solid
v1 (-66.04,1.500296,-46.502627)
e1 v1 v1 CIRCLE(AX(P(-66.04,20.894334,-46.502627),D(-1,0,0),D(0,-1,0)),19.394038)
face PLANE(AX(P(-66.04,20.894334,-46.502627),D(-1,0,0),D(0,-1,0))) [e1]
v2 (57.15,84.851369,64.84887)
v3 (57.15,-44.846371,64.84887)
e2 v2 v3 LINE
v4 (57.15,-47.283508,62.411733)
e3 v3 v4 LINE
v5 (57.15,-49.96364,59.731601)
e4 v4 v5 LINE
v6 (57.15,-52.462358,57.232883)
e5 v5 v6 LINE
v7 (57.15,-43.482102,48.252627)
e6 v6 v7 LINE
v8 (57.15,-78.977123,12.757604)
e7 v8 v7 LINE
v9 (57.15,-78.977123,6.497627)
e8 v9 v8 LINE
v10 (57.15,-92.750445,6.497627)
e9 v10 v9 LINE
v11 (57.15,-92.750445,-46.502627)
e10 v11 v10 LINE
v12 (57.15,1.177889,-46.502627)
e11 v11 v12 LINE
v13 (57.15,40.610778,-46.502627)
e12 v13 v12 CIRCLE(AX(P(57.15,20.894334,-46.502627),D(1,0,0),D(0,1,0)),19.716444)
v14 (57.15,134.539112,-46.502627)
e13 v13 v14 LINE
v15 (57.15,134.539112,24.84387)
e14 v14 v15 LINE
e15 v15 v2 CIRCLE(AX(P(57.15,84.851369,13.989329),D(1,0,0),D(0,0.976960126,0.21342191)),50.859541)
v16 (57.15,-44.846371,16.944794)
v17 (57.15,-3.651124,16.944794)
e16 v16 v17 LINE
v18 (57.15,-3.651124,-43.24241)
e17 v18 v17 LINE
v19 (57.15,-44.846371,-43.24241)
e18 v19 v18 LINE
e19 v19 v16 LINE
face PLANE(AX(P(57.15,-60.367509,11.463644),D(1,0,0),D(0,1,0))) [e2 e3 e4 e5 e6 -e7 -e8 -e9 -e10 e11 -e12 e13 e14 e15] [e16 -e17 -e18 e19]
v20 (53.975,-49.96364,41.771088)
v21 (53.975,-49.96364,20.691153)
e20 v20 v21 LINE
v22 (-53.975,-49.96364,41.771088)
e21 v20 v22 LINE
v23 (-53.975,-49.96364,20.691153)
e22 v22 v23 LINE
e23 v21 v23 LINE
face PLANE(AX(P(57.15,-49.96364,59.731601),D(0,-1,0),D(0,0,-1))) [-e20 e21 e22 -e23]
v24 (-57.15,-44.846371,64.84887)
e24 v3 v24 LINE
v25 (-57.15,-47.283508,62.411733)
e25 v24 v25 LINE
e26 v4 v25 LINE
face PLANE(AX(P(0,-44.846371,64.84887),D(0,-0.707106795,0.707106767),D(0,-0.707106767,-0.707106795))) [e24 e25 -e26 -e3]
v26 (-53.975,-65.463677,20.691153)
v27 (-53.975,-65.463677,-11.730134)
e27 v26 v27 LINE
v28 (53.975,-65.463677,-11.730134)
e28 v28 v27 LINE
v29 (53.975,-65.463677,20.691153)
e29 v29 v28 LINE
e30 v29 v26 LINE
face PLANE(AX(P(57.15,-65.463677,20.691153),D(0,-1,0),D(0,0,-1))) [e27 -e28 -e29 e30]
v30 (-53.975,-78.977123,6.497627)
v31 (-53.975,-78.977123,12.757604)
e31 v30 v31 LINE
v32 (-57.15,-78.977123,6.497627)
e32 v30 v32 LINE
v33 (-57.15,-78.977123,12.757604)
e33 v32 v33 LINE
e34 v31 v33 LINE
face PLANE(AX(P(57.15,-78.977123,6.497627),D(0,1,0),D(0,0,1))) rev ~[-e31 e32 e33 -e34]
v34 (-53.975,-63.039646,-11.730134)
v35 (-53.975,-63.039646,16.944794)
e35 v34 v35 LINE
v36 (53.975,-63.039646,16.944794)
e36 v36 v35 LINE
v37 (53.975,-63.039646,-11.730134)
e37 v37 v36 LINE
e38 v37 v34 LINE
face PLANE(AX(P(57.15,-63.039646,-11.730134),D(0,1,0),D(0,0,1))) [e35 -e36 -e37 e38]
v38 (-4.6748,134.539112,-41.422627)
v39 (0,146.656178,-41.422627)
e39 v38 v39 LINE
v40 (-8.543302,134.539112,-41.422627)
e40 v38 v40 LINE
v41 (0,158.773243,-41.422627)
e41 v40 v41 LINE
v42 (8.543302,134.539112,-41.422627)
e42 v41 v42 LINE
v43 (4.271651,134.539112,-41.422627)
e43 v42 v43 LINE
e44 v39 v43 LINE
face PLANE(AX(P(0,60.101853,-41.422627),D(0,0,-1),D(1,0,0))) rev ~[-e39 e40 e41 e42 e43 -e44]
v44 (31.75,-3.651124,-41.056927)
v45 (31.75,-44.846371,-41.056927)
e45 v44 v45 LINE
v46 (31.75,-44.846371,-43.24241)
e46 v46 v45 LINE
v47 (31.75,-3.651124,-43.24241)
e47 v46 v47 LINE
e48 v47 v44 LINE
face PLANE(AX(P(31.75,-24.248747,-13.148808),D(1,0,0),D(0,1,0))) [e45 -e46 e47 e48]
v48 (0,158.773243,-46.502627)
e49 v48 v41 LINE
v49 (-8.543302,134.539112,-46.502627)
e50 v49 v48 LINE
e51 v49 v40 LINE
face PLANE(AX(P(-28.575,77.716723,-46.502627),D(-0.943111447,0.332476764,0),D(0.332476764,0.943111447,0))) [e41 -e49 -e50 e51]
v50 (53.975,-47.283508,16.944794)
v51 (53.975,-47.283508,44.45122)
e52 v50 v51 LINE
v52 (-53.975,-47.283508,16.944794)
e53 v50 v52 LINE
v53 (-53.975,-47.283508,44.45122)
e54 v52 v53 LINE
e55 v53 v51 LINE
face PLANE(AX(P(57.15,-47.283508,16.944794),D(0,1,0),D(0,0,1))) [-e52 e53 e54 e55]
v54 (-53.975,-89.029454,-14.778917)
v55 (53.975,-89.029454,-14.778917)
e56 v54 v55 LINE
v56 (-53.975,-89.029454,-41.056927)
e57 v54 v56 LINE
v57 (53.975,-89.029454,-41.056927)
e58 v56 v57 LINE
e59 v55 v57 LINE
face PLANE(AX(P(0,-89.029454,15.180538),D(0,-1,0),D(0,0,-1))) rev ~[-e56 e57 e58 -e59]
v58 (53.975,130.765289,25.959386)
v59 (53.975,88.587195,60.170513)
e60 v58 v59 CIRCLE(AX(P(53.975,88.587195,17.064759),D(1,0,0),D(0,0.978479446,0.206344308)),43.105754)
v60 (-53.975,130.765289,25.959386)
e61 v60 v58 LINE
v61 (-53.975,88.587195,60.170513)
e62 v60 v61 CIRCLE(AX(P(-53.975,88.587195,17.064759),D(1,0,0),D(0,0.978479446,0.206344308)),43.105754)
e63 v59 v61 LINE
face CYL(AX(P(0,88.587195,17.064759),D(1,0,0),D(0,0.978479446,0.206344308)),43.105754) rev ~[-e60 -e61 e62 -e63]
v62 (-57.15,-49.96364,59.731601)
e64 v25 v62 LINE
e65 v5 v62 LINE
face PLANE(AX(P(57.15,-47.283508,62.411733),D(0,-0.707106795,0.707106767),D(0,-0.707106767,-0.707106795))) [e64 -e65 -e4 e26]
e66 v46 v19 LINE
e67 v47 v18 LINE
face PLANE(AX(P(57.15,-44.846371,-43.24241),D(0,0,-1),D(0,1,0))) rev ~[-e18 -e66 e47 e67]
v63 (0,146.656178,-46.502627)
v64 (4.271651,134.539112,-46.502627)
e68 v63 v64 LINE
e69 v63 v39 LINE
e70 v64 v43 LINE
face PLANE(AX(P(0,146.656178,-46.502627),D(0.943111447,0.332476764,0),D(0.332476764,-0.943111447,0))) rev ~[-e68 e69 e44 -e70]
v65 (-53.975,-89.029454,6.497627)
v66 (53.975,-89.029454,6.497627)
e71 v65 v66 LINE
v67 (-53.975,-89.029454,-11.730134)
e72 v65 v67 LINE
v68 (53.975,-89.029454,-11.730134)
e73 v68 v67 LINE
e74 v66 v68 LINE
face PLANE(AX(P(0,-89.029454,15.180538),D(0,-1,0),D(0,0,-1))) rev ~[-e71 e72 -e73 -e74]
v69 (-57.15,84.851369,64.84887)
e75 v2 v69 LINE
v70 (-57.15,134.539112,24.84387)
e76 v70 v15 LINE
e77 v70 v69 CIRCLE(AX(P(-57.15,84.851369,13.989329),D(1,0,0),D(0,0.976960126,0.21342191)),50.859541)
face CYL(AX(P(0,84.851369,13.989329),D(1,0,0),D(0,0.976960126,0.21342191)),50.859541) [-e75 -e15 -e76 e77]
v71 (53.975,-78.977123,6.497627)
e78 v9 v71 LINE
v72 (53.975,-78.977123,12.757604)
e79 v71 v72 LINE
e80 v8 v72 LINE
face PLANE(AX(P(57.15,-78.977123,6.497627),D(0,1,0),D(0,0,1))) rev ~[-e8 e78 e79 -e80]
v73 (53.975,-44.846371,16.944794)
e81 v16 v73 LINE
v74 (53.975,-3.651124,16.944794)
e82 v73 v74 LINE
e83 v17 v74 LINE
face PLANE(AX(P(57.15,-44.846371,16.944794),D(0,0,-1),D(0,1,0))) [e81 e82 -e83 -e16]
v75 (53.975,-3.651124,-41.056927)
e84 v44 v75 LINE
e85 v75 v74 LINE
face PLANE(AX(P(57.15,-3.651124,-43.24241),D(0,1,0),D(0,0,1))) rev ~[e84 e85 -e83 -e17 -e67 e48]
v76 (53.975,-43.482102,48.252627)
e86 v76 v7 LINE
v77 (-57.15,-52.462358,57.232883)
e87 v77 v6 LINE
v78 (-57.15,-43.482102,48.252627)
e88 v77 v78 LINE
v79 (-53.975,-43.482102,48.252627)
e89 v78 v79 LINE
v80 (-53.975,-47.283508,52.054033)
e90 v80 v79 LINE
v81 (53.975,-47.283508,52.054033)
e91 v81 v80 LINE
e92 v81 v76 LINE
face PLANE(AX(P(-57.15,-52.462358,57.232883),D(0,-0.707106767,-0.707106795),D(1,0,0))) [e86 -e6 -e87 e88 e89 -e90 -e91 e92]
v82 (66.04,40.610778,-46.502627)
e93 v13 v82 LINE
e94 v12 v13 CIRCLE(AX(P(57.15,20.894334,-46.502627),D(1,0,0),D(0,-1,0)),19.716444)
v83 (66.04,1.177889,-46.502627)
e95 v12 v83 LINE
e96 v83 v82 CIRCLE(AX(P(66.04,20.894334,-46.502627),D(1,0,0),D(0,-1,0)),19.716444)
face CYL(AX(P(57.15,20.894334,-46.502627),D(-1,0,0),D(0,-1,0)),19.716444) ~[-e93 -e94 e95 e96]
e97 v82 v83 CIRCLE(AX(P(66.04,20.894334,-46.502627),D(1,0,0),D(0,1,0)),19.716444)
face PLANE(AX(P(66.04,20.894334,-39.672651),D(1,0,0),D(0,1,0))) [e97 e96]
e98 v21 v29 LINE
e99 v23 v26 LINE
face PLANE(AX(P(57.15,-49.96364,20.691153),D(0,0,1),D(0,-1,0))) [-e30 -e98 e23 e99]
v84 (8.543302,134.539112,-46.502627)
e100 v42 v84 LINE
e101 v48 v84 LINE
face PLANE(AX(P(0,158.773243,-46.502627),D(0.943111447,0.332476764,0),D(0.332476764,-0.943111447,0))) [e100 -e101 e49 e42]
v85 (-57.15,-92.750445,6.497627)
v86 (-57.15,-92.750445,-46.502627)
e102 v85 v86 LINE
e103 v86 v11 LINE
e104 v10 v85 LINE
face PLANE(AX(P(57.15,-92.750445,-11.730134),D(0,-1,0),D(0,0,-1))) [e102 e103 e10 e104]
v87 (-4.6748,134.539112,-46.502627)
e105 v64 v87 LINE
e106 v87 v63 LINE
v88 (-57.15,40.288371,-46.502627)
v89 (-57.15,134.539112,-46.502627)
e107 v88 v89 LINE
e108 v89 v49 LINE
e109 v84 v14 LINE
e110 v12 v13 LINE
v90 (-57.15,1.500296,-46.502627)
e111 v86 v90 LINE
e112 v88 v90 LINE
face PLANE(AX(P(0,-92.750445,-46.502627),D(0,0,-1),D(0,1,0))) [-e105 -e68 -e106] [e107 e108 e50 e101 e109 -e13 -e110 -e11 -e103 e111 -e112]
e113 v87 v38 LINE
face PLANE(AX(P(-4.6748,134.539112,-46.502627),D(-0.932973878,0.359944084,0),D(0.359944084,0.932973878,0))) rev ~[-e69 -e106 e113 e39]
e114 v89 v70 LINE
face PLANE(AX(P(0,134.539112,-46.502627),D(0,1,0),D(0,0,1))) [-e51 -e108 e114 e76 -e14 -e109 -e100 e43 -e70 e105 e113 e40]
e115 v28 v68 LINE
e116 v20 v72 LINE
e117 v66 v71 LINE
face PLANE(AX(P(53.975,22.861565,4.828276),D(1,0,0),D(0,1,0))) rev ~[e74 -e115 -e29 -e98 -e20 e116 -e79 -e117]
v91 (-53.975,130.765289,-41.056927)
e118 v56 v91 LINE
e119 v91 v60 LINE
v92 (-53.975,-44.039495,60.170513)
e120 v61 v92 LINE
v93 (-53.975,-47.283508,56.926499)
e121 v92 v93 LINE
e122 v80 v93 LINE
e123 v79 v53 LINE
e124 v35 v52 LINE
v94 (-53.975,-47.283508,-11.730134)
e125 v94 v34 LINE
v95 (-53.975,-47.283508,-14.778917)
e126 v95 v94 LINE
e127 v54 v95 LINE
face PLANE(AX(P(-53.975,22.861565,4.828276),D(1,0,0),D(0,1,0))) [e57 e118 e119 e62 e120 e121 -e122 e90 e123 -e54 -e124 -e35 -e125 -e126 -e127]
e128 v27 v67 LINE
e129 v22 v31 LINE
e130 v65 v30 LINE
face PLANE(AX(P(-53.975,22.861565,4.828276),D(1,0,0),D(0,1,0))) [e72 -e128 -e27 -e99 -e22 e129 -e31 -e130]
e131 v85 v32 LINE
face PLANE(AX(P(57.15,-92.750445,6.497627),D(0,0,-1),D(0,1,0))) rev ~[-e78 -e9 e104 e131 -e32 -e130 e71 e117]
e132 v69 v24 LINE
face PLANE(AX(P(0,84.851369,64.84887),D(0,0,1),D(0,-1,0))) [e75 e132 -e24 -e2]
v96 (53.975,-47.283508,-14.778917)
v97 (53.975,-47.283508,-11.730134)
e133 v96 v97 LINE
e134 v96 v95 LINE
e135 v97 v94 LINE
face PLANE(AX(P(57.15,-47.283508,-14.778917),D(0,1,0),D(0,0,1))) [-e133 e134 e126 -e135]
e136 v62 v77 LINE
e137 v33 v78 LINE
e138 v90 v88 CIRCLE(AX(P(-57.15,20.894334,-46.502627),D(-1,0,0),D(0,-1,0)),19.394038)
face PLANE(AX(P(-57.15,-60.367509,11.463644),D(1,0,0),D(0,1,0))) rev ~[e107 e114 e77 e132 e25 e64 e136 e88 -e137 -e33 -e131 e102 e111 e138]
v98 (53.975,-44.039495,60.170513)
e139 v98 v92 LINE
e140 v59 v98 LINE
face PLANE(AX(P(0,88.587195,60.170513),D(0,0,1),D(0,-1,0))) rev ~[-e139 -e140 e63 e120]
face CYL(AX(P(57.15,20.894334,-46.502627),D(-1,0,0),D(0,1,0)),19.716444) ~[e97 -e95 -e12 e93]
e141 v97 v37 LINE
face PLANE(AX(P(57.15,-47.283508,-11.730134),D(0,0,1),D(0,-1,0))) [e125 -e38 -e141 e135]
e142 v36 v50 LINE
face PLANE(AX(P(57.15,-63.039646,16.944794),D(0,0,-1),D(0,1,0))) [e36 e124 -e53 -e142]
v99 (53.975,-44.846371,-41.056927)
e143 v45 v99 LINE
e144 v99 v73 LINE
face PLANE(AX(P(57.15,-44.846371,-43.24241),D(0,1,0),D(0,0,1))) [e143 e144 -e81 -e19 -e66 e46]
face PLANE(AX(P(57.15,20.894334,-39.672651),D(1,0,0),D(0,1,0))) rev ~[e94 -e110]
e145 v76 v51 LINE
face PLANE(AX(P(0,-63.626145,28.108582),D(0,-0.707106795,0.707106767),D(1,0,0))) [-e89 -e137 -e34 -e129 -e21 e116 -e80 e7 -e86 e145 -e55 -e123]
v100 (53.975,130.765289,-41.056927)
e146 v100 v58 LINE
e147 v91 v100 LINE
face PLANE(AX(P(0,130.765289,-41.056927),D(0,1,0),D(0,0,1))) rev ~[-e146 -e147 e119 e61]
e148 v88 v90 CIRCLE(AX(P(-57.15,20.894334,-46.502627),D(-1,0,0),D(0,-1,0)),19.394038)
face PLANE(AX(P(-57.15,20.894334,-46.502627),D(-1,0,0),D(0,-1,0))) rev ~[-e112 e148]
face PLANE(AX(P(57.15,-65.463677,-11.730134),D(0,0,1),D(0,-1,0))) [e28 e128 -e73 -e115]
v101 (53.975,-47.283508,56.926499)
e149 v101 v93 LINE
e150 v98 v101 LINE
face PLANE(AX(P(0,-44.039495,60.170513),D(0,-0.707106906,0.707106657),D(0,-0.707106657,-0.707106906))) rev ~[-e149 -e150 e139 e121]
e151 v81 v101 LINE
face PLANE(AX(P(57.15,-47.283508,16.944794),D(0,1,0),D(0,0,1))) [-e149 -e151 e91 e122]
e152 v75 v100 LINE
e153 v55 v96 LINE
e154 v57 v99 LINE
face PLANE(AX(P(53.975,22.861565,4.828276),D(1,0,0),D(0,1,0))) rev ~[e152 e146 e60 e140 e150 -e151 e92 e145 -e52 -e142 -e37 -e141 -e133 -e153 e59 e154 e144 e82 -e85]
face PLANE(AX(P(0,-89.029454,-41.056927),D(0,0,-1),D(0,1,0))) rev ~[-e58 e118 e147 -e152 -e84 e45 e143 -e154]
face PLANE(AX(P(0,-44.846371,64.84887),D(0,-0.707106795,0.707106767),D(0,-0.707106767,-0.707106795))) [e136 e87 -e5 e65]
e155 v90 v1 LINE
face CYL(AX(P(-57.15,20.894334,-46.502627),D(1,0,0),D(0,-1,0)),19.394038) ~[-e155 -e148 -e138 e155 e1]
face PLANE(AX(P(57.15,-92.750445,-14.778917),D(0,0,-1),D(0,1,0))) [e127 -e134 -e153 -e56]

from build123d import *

# Parameters (mm, degrees)
F1_DEPTH  = 57.15
F3_DEPTH  = 5.08
F5_DEPTH  = 41.402
F7_DEPTH  = 53.975
F8_W      = 41.1952470895
F8_H      = 60.1872038096
F9_DEPTH  = 25.4
F11_DEPTH = 114.3
F12_W     = 114.3
F12_H     = 56.9759604018
F13_DEPTH = 12.7
F15_DEPTH = 114.3
F17_DEPTH = 8.89
F18_R     = 19.3940377175
F19_DEPTH = 8.89


with BuildPart() as f1:
    # F0 (on Right) → F1 (new body, symmetric)
    with BuildSketch(Plane.YZ):
        with BuildLine():
            Line((-92.7504450083, 16.9447939843), (-92.7504450083, -46.5026274323))
            Line((-92.7504450083, -46.5026274323), (134.5391124487, -46.5026274323))
            Line((134.5391124487, -46.5026274323), (134.5391124487, 24.8438697308))
            ThreePointArc((134.5391124487, 24.8438697308), (116.7467916318, 53.6046661319), (84.8513692617, 64.848870039))
            Line((84.8513692617, 64.848870039), (-44.8463708162, 64.848870039))
            Line((-44.8463708162, 64.848870039), (-92.7504450083, 16.9447939843))
        make_face()
    extrude(amount=F1_DEPTH, both=True)

    # F2 (on face) → F3 (join)
    with BuildSketch(Plane(origin=(0, 0, -46.5026274323), x_dir=(1, 0, 0), z_dir=(0, 0, -1))):
        Polygon((-28.575, -77.7167230844), (0, -134.5391124487), (28.575, -77.7167230844), (57.15, -20.8943337202), (-57.15, -20.8943337202), align=None)
        Polygon((28.575, -77.7167230844), (0, -134.5391124487), (8.5433015109, -134.5391124487), align=None)
        Polygon((-8.5433015109, -134.5391124487), (0, -134.5391124487), (-28.575, -77.7167230844), align=None)
        Polygon((8.5433015109, -134.5391124487), (0, -134.5391124487), (-8.5433015109, -134.5391124487), (0, -158.7732434273), align=None)
    extrude(amount=-F3_DEPTH)

    # F4 (on face) → F5 (cut)
    with BuildSketch(Plane(origin=(0, 0, -46.5026274323), x_dir=(1, 0, 0), z_dir=(0, 0, -1))):
        Polygon((-4.6747997403, -134.5391124487), (0, -146.656177938), (4.2716507554, -134.5391124487), align=None)
    extrude(amount=-F5_DEPTH, mode=Mode.SUBTRACT)

    # F6 (on Right) → F7 (cut, symmetric)
    with BuildSketch(Plane.YZ):
        with BuildLine():
            Line((-89.0294536948, 15.1805384085), (-89.0294536948, -41.0569272935))
            Line((-89.0294536948, -41.0569272935), (130.7652890682, -41.0569272935))
            Line((130.7652890682, -41.0569272935), (130.7652890682, 25.959385559))
            ThreePointArc((130.7652890682, 25.959385559), (115.7413511895, 50.5424798047), (88.5871946812, 60.1705126464))
            Line((88.5871946812, 60.1705126464), (-44.0394952893, 60.1705126464))
            Line((-44.0394952893, 60.1705126464), (-89.0294536948, 15.1805384085))
        make_face()
    extrude(amount=F7_DEPTH, both=True, mode=Mode.SUBTRACT)

    # F8 (on face) → F9 (cut, symmetric)
    with BuildSketch(Plane.YZ.offset(57.15)):
        with Locations((-24.2487472715, -13.1488079205)):
            Rectangle(F8_W, F8_H)
    extrude(amount=F9_DEPTH, both=True, mode=Mode.SUBTRACT)

    # F10 (on face) → F11 (join)
    with BuildSketch(Plane.YZ.offset(57.15)):
        Polygon((-92.7504450083, -11.7301335558), (-92.7504450083, -14.778916724), (-47.2835078835, -14.778916724), (-47.2835078835, -11.7301335558), (-63.0396455526, -11.7301335558), (-63.0396455526, 16.9447939843), (-47.2835078835, 16.9447939843), (-47.2835078835, 62.4117328769), (-49.9636399546, 59.7316007017), (-49.9636399546, 20.691152662), (-65.4636770487, 20.691152662), (-65.4636770487, -11.7301335558), align=None)
    extrude(amount=-F11_DEPTH)

    # F12 (on face) → F13 (cut)
    with BuildSketch(Plane(origin=(0, -54.8476212995, 54.8476191669), x_dir=(1, 0, 0), z_dir=(0, -0.7071067949, 0.7071067674))):
        with Locations((0, -25.1147081824)):
            Rectangle(F12_W, F12_H)
    extrude(amount=-F13_DEPTH, mode=Mode.SUBTRACT)

    # F14 (on face) → F15 (cut)
    with BuildSketch(Plane.YZ.offset(57.15)):
        Polygon((-92.7504450083, 16.9447939843), (-92.7504450083, 6.4976271242), (-78.9771229029, 6.4976271242), (-78.9771229029, 12.7576040339), (-83.7701887126, 7.9645380378), align=None)
    extrude(amount=-F15_DEPTH, mode=Mode.SUBTRACT)

    # F16 (on face) → F17 (join)
    with BuildSketch(Plane.YZ.offset(57.15)):
        with BuildLine():
            Line((20.8943337202, -46.5026274323), (40.6107781849, -46.5026274323))
            ThreePointArc((40.6107781849, -46.5026274323), (20.8943337202, -26.7861829676), (1.1778892555, -46.5026274323))
            Line((1.1778892555, -46.5026274323), (20.8943337202, -46.5026274323))
        make_face()
        with BuildLine():
            ThreePointArc((1.1778892555, -46.5026274323), (20.8943337202, -66.2190718971), (40.6107781849, -46.5026274323))
            Line((40.6107781849, -46.5026274323), (20.8943337202, -46.5026274323))
            Line((20.8943337202, -46.5026274323), (1.1778892555, -46.5026274323))
        make_face()
    extrude(amount=F17_DEPTH)

    # F18 (on face) → F19 (join)
    with BuildSketch(Plane(origin=(-57.15, 0, 0), x_dir=(0, -1, 0), z_dir=(-1, 0, 0))):
        with Locations((-20.8943337202, -46.5026274323)):
            Circle(F18_R)
    extrude(amount=F19_DEPTH)


solid = f1.part
